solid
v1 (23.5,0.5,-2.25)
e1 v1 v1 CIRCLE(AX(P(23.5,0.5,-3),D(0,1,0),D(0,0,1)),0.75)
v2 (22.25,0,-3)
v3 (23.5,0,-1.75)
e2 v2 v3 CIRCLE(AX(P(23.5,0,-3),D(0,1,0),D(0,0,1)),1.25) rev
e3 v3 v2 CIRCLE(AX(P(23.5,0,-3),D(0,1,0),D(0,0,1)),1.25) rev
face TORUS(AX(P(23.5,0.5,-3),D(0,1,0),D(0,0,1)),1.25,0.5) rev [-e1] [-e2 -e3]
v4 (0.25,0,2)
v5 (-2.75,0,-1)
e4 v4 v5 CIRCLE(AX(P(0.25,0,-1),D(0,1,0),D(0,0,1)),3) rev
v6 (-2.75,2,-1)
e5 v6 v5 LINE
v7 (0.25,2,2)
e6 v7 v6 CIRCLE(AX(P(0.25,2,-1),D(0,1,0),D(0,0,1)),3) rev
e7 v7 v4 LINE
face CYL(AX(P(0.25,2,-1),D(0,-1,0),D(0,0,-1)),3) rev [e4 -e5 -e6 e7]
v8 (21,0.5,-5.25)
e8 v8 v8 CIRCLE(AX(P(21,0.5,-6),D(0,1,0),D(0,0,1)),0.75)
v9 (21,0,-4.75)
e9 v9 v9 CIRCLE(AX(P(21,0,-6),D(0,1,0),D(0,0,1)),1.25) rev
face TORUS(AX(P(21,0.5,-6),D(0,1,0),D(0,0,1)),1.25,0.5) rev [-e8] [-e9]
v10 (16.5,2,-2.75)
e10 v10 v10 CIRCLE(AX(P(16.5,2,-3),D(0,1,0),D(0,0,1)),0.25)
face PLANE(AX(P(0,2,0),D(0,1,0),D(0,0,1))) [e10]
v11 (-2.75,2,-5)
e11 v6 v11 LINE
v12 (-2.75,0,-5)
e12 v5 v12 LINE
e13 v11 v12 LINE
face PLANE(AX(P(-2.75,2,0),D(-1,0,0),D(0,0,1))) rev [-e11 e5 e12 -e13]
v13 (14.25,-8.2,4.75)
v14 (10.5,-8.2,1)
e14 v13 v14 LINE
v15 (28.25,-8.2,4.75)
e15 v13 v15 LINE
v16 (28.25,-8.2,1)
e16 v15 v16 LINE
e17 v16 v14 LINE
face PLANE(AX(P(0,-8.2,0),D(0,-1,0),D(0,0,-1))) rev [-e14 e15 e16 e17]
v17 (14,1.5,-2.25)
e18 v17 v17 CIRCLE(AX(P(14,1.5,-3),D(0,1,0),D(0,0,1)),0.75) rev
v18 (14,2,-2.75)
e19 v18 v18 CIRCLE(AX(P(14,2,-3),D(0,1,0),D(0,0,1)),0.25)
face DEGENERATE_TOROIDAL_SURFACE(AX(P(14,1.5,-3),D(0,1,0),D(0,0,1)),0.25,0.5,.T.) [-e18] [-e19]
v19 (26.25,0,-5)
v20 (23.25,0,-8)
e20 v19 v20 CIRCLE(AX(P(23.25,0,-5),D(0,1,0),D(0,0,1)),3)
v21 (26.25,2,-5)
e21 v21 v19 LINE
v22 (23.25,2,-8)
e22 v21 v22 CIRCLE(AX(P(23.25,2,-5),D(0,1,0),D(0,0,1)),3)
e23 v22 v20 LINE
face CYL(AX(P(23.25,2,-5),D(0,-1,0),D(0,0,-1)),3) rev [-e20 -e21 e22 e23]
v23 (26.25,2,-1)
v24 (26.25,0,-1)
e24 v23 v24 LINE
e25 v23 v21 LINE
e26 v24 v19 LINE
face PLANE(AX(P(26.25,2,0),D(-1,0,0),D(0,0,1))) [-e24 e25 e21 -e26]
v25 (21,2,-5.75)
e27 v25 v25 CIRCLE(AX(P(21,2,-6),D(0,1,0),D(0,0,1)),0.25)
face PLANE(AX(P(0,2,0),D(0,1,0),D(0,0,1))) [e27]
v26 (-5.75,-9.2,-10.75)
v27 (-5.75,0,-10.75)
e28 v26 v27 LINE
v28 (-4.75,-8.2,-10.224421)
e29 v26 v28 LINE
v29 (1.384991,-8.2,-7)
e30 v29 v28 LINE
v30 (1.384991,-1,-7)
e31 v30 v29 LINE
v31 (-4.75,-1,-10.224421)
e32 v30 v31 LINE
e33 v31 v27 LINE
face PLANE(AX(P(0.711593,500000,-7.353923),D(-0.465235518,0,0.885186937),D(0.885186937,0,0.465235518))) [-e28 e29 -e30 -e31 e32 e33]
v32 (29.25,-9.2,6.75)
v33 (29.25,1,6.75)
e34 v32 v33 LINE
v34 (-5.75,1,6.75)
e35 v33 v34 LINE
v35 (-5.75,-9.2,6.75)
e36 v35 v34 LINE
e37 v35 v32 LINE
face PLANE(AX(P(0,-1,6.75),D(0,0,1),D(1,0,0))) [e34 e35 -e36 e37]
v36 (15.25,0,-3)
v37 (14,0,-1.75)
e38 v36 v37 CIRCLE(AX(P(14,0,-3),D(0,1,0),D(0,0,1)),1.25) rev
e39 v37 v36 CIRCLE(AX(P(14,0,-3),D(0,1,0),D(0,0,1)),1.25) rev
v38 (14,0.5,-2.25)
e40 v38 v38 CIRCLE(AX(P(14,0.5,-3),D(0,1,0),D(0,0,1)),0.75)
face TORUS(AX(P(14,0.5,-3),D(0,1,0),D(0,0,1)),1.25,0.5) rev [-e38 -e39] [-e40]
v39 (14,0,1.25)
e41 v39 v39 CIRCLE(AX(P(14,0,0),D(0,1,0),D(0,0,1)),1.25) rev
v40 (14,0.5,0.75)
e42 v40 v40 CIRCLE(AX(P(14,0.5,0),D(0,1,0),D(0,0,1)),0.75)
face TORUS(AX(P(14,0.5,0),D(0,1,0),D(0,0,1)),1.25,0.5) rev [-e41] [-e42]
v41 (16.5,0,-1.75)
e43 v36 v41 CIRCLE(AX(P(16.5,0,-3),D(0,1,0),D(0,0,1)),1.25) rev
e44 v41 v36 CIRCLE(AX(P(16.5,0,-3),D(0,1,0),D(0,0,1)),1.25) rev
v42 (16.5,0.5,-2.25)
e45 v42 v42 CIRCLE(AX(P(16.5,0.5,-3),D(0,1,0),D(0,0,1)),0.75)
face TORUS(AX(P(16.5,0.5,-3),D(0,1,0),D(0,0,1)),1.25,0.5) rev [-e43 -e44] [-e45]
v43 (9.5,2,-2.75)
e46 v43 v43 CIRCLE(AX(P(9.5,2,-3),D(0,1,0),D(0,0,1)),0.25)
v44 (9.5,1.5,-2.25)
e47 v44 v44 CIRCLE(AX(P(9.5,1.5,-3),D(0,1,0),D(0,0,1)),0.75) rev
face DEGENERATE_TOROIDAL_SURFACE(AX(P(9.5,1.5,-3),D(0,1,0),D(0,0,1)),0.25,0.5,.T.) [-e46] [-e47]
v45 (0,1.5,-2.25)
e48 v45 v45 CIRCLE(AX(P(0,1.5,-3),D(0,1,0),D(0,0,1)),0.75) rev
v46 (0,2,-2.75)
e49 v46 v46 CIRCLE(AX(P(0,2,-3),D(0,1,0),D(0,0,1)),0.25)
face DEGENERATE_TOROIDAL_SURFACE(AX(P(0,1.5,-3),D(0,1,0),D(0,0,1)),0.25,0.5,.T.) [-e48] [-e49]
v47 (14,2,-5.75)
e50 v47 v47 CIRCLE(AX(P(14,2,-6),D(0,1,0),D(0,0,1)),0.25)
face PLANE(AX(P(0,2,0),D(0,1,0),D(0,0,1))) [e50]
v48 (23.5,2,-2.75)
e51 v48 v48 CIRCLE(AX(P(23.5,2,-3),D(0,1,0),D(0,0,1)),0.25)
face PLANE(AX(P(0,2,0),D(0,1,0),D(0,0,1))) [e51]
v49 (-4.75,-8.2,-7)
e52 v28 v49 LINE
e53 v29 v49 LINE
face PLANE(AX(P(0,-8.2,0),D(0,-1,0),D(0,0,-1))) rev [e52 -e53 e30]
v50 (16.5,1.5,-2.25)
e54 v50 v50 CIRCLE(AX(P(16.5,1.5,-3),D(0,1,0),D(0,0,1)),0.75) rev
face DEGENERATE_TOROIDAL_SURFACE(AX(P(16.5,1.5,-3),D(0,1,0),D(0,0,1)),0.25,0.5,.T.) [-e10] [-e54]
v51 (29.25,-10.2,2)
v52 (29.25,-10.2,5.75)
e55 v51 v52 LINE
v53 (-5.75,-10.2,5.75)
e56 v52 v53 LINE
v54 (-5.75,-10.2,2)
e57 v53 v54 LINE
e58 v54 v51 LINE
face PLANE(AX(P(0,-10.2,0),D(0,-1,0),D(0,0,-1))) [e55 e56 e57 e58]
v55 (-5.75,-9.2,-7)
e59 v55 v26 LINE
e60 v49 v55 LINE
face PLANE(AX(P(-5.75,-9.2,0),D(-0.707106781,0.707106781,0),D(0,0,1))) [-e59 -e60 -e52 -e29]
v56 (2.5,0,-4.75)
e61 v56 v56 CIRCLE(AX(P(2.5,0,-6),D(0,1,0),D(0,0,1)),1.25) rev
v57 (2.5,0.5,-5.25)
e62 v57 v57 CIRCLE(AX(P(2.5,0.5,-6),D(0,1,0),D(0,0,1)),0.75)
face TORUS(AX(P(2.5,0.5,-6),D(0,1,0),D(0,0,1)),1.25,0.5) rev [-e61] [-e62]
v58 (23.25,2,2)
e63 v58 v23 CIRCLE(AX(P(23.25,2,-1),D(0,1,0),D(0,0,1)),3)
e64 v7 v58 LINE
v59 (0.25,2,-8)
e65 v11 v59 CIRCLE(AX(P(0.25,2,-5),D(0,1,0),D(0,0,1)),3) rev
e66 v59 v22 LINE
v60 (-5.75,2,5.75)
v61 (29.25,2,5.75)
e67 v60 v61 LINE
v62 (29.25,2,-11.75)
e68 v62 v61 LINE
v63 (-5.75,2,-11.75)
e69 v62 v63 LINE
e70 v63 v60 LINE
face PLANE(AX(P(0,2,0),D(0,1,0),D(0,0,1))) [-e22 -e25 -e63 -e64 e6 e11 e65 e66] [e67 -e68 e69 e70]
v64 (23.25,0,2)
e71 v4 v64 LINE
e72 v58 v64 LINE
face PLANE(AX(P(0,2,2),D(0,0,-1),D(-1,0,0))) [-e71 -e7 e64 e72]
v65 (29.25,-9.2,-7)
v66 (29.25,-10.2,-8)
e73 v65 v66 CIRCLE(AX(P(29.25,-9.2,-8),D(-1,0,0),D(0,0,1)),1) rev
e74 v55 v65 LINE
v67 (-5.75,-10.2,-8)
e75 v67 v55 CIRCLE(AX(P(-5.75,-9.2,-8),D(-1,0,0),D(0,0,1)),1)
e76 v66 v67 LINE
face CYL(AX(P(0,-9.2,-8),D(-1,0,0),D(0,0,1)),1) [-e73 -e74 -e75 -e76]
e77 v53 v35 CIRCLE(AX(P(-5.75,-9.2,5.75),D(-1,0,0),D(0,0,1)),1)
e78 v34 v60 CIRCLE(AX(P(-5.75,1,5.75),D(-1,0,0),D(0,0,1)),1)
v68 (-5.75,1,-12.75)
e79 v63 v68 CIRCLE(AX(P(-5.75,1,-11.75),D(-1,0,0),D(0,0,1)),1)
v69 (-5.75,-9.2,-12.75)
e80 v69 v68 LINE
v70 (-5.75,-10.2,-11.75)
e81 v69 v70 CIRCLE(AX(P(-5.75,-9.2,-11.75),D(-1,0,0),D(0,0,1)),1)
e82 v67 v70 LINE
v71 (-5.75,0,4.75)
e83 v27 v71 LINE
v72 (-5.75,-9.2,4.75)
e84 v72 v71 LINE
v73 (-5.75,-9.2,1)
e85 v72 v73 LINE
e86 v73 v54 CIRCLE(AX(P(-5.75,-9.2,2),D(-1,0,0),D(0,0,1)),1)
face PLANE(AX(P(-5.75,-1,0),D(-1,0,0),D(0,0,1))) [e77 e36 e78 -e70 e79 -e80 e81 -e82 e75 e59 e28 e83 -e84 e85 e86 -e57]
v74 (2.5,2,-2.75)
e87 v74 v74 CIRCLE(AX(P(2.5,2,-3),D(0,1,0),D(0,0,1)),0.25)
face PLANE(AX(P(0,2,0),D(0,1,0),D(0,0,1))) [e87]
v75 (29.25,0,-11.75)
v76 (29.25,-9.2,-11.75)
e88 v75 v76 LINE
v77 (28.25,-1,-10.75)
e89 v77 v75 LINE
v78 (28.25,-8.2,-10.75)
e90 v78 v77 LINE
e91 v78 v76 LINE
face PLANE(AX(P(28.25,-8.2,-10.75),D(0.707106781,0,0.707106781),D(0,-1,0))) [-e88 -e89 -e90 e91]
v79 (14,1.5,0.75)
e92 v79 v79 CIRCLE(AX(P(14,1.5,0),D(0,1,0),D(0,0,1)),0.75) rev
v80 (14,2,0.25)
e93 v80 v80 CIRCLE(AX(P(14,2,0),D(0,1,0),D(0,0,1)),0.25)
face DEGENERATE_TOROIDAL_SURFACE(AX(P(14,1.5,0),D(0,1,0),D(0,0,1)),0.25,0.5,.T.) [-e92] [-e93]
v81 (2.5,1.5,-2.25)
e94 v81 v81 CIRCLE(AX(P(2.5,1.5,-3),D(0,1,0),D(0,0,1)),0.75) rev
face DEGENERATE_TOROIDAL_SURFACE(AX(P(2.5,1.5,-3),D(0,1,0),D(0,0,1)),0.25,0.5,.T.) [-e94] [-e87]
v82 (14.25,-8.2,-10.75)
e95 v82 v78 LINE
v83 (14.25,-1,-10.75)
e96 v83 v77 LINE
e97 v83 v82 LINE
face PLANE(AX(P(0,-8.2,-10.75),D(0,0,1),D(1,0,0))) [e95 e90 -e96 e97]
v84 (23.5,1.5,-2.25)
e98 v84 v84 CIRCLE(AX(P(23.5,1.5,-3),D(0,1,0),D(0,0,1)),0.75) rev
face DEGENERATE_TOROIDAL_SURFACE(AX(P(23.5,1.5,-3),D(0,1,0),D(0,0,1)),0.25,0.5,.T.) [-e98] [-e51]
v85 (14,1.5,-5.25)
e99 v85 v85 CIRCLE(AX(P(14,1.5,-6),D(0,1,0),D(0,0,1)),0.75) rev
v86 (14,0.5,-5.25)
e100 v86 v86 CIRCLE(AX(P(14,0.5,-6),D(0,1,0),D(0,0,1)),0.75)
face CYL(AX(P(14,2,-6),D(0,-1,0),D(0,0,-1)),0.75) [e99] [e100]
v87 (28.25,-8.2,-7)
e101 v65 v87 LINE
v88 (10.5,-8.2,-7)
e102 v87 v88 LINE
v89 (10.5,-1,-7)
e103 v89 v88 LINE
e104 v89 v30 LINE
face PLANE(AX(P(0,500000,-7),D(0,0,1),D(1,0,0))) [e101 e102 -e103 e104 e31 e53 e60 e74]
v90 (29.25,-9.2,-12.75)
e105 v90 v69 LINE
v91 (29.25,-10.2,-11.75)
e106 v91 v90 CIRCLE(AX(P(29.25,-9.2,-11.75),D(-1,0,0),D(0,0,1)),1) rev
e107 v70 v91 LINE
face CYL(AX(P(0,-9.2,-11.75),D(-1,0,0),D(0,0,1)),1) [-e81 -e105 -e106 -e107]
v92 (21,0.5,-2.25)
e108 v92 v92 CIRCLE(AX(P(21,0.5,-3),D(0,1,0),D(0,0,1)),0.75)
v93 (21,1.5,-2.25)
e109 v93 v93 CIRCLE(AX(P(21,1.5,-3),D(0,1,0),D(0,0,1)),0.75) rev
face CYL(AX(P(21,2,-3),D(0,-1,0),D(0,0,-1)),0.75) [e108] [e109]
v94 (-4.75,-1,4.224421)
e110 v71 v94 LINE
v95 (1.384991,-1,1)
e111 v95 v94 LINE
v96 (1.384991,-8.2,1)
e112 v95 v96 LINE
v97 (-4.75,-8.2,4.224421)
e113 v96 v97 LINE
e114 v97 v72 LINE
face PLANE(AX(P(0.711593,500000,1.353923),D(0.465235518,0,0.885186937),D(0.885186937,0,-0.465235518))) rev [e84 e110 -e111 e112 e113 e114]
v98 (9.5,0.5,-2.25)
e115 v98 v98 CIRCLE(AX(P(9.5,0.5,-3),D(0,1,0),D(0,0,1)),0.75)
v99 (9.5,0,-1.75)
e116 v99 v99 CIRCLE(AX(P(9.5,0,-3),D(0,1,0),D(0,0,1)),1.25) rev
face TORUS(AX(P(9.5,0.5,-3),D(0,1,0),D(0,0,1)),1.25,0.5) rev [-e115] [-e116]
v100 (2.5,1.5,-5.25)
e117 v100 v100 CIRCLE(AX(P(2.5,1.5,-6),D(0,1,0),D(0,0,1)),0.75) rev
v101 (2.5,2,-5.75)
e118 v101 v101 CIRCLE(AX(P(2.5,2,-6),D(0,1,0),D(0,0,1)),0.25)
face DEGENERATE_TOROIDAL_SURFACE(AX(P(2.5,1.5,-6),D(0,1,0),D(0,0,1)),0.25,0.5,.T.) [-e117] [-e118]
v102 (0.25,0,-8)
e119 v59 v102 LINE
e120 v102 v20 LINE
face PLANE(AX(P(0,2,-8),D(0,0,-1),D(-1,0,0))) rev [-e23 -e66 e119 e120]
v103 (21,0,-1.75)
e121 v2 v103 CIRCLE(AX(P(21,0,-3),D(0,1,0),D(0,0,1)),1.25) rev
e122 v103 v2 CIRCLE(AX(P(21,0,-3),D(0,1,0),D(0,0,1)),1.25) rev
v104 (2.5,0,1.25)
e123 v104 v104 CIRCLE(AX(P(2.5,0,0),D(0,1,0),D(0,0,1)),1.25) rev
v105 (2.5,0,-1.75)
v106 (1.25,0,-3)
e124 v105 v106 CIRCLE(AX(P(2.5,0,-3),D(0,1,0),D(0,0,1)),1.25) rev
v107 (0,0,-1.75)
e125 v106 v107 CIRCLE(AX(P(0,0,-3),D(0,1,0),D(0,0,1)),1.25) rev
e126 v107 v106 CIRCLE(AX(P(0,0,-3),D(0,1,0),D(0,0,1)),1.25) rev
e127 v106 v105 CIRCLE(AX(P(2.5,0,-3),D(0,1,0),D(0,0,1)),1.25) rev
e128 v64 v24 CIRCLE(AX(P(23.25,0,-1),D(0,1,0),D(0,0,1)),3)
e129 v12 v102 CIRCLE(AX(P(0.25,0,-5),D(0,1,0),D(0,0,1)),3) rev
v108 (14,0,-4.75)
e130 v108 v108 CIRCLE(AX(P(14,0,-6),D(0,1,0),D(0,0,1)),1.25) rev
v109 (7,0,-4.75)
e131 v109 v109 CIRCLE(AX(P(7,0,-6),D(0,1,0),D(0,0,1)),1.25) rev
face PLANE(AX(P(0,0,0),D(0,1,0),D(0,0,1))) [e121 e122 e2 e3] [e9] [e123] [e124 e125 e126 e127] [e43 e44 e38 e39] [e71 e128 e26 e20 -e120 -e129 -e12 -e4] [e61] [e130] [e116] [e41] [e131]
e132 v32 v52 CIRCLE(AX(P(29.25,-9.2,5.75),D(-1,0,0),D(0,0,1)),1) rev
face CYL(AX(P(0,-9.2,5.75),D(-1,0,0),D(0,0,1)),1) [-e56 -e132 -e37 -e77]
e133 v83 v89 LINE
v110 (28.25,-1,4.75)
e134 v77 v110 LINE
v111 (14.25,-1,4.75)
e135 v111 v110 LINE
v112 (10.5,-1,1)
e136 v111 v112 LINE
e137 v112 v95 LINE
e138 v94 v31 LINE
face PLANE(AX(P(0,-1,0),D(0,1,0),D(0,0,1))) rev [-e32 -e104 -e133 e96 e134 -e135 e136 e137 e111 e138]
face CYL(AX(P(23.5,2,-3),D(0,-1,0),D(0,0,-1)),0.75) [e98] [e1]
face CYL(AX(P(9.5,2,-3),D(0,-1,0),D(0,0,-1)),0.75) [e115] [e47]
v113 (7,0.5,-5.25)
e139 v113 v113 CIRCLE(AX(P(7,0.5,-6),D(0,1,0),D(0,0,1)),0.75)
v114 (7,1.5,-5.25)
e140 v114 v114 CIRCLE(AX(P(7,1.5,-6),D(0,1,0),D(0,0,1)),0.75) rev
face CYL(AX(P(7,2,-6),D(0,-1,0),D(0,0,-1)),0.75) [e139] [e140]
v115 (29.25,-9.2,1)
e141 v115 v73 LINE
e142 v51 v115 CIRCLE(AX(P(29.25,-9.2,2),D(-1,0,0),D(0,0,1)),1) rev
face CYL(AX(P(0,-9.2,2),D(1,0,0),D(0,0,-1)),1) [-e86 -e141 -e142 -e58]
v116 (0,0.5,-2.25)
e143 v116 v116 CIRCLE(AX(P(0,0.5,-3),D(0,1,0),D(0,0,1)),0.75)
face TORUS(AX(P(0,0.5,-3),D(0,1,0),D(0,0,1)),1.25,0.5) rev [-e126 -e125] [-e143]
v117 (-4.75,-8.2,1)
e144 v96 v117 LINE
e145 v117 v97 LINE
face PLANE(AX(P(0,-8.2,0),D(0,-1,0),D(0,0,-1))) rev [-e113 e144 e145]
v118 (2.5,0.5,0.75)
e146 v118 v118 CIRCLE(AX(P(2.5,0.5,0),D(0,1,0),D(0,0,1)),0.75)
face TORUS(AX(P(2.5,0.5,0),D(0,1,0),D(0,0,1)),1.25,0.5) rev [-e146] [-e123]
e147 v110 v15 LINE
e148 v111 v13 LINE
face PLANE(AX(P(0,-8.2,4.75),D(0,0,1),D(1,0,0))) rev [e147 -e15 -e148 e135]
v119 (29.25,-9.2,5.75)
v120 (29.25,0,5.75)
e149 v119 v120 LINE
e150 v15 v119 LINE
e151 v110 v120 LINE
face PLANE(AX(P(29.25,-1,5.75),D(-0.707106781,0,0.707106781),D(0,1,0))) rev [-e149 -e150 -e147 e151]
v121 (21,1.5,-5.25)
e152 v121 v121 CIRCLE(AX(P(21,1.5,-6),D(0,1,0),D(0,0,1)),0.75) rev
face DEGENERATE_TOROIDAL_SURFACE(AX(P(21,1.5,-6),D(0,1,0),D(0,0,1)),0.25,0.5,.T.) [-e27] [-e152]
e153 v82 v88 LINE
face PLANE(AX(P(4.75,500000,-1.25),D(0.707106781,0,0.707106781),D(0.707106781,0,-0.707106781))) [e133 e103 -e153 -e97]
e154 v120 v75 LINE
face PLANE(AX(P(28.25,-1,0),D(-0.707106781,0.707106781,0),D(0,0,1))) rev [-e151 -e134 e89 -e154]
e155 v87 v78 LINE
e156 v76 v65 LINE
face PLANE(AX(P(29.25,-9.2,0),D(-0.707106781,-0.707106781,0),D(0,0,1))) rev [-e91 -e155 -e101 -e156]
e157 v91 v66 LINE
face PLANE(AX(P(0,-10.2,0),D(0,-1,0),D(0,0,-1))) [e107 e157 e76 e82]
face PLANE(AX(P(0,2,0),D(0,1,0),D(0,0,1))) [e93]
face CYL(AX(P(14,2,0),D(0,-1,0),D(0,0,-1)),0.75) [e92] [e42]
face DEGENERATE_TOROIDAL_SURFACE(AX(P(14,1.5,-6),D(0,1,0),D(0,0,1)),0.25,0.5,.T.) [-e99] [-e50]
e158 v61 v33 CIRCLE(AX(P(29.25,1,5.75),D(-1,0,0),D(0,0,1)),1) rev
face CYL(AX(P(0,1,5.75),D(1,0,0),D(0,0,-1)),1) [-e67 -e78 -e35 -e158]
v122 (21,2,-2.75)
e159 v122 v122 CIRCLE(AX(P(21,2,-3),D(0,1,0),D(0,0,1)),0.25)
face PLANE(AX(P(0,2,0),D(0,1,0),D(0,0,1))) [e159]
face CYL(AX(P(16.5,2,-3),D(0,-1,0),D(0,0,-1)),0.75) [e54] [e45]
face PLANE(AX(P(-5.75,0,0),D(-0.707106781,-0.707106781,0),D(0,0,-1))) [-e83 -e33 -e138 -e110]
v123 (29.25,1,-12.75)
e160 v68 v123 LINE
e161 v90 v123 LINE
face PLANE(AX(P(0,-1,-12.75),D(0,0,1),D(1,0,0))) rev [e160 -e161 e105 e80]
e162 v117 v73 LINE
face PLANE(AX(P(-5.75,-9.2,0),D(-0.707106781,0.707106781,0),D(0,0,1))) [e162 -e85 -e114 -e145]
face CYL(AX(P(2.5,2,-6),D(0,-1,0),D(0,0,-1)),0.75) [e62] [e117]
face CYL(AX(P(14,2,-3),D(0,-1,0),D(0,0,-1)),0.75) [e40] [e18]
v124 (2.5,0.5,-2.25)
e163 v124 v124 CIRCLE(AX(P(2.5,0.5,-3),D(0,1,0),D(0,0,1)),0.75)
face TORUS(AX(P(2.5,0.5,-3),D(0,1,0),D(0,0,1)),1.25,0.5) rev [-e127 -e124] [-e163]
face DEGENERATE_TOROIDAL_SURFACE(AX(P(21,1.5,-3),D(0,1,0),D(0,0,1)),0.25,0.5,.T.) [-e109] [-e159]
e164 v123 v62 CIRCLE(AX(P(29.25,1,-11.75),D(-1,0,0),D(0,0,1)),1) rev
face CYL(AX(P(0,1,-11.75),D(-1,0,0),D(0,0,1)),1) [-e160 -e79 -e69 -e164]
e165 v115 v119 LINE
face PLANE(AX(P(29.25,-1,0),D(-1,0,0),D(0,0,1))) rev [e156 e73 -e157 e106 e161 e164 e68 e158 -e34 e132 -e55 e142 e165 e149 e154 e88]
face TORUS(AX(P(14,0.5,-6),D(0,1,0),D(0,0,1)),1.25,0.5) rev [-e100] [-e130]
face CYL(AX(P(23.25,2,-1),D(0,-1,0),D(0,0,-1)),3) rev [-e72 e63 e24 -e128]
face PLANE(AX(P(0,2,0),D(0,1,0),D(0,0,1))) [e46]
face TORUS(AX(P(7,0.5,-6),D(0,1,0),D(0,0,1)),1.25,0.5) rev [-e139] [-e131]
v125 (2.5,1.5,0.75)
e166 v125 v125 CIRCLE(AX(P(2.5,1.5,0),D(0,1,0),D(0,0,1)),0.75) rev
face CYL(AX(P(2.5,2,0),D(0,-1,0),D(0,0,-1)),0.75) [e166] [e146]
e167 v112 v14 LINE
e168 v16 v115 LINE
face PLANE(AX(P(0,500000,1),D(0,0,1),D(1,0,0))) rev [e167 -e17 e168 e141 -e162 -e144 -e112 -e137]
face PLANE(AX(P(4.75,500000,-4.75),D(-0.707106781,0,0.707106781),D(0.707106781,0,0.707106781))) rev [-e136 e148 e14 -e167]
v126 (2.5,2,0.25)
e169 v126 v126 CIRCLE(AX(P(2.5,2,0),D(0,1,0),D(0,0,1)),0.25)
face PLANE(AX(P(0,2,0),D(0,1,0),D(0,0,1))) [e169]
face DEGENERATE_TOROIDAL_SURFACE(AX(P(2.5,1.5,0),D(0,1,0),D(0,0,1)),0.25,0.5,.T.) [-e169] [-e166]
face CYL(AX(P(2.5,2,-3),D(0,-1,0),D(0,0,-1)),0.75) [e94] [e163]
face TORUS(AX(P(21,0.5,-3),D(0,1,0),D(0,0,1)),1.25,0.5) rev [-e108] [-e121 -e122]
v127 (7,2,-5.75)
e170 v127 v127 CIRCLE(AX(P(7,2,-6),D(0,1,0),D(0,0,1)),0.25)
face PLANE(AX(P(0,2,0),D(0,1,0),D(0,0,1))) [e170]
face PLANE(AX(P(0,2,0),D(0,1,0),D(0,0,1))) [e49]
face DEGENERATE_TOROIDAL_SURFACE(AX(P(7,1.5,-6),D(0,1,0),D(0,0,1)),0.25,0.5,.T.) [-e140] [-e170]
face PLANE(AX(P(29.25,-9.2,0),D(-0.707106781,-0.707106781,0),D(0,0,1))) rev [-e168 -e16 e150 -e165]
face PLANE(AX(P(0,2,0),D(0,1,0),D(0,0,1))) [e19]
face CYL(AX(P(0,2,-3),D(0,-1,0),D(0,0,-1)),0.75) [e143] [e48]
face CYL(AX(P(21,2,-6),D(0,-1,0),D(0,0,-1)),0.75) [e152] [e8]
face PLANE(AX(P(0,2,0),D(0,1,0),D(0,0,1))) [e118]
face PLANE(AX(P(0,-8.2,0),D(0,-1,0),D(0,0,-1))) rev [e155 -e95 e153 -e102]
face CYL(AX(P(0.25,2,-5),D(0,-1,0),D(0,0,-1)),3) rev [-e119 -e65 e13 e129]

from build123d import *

# Parameters (mm, degrees)
SKETCH1_R              = 0.75
BOSS_EXTRUDE1_DEPTH    = 2
BOSS_EXTRUDE1_2_DEPTH  = 2
BOSS_EXTRUDE1_3_DEPTH  = 2
BOSS_EXTRUDE1_4_DEPTH  = 2
BOSS_EXTRUDE1_5_DEPTH  = 2
BOSS_EXTRUDE1_6_DEPTH  = 2
BOSS_EXTRUDE1_7_DEPTH  = 2
BOSS_EXTRUDE1_8_DEPTH  = 2
BOSS_EXTRUDE1_9_DEPTH  = 2
BOSS_EXTRUDE1_10_DEPTH = 2
BOSS_EXTRUDE1_11_DEPTH = 2
BOSS_EXTRUDE1_12_DEPTH = 2
BOSS_EXTRUDE1_13_DEPTH = 2
SKETCH1_3_W            = 35
SKETCH1_3_H            = 19.5
BOSS_EXTRUDE2_DEPTH    = 1
FILLET1_R              = 0.5
SKETCH1_4_W            = 35
SKETCH1_4_H            = 17.5
SKETCH1_4_H_2          = 2
BOSS_EXTRUDE3_DEPTH    = 2
SKETCH1_5_W            = 35
SKETCH1_5_H            = 2
BOSS_EXTRUDE4_DEPTH    = 8.2
BOSS_EXTRUDE5_REACH    = 35.499
SKETCH2_3_W            = 35
SKETCH2_3_H            = 2
SKETCH2_3_H_2          = 7.75
BOSS_EXTRUDE6_DEPTH    = 2
FILLET2_R              = 1
CHAMFER1_SIZE          = 1
CUT_EXTRUDE1_DEPTH     = 2
FILLET3_R              = 1
CHAMFER2_SIZE          = 1


with BuildPart() as part:
    # Sketch1 → Boss-Extrude1 (new body)
    with BuildSketch(Plane(origin=(0, 0, 0), x_dir=(1, 0, 0), z_dir=(0, 1, 0))):
        with Locations(Location((2.5, 3, 0), (0, 0, 270))):
            Circle(SKETCH1_R)
    extrude(amount=BOSS_EXTRUDE1_DEPTH)



with BuildPart() as body_2:
    # Sketch1 → Boss-Extrude1 2 (new body)
    with BuildSketch(Plane(origin=(0, 0, 0), x_dir=(1, 0, 0), z_dir=(0, 1, 0))):
        with Locations(Location((2.5, 6, 0), (0, 0, 270))):
            Circle(SKETCH1_R)
    extrude(amount=BOSS_EXTRUDE1_2_DEPTH)


with BuildPart() as body_3:
    # Sketch1 → Boss-Extrude1 3 (new body)
    with BuildSketch(Plane(origin=(0, 0, 0), x_dir=(1, 0, 0), z_dir=(0, 1, 0))):
        with Locations(Location((2.5, 0, 0), (0, 0, 270))):
            Circle(SKETCH1_R)
    extrude(amount=BOSS_EXTRUDE1_3_DEPTH)


with BuildPart() as body_4:
    # Sketch1 → Boss-Extrude1 4 (new body)
    with BuildSketch(Plane(origin=(0, 0, 0), x_dir=(1, 0, 0), z_dir=(0, 1, 0))):
        with Locations(Location((0, 3, 0), (0, 0, 270))):
            Circle(SKETCH1_R)
    extrude(amount=BOSS_EXTRUDE1_4_DEPTH)


with BuildPart() as body_5:
    # Sketch1 → Boss-Extrude1 5 (new body)
    with BuildSketch(Plane(origin=(0, 0, 0), x_dir=(1, 0, 0), z_dir=(0, 1, 0))):
        with Locations(Location((7, 6, 0), (0, 0, 270))):
            Circle(SKETCH1_R)
    extrude(amount=BOSS_EXTRUDE1_5_DEPTH)


with BuildPart() as body_6:
    # Sketch1 → Boss-Extrude1 6 (new body)
    with BuildSketch(Plane(origin=(0, 0, 0), x_dir=(1, 0, 0), z_dir=(0, 1, 0))):
        with Locations(Location((9.5, 3, 0), (0, 0, 270))):
            Circle(SKETCH1_R)
    extrude(amount=BOSS_EXTRUDE1_6_DEPTH)


with BuildPart() as body_7:
    # Sketch1 → Boss-Extrude1 7 (new body)
    with BuildSketch(Plane(origin=(0, 0, 0), x_dir=(1, 0, 0), z_dir=(0, 1, 0))):
        with Locations(Location((14, 6, 0), (0, 0, 270))):
            Circle(SKETCH1_R)
    extrude(amount=BOSS_EXTRUDE1_7_DEPTH)


with BuildPart() as body_8:
    # Sketch1 → Boss-Extrude1 8 (new body)
    with BuildSketch(Plane(origin=(0, 0, 0), x_dir=(1, 0, 0), z_dir=(0, 1, 0))):
        with Locations(Location((14, 3, 0), (0, 0, 270))):
            Circle(SKETCH1_R)
    extrude(amount=BOSS_EXTRUDE1_8_DEPTH)


with BuildPart() as body_9:
    # Sketch1 → Boss-Extrude1 9 (new body)
    with BuildSketch(Plane(origin=(0, 0, 0), x_dir=(1, 0, 0), z_dir=(0, 1, 0))):
        with Locations(Location((16.5, 3, 0), (0, 0, 270))):
            Circle(SKETCH1_R)
    extrude(amount=BOSS_EXTRUDE1_9_DEPTH)


with BuildPart() as body_10:
    # Sketch1 → Boss-Extrude1 10 (new body)
    with BuildSketch(Plane(origin=(0, 0, 0), x_dir=(1, 0, 0), z_dir=(0, 1, 0))):
        with Locations(Location((14, 0, 0), (0, 0, 270))):
            Circle(SKETCH1_R)
    extrude(amount=BOSS_EXTRUDE1_10_DEPTH)


with BuildPart() as body_11:
    # Sketch1 → Boss-Extrude1 11 (new body)
    with BuildSketch(Plane(origin=(0, 0, 0), x_dir=(1, 0, 0), z_dir=(0, 1, 0))):
        with Locations(Location((21, 6, 0), (0, 0, 270))):
            Circle(SKETCH1_R)
    extrude(amount=BOSS_EXTRUDE1_11_DEPTH)


with BuildPart() as body_12:
    # Sketch1 → Boss-Extrude1 12 (new body)
    with BuildSketch(Plane(origin=(0, 0, 0), x_dir=(1, 0, 0), z_dir=(0, 1, 0))):
        with Locations(Location((21, 3, 0), (0, 0, 270))):
            Circle(SKETCH1_R)
    extrude(amount=BOSS_EXTRUDE1_12_DEPTH)


with BuildPart() as body_13:
    # Sketch1 → Boss-Extrude1 13 (new body)
    with BuildSketch(Plane(origin=(0, 0, 0), x_dir=(1, 0, 0), z_dir=(0, 1, 0))):
        with Locations(Location((23.5, 3, 0), (0, 0, 270))):
            Circle(SKETCH1_R)
    extrude(amount=BOSS_EXTRUDE1_13_DEPTH)


with BuildPart() as part_1:
    add(part.part)

    add(body_2.part)  # Boss-Extrude2 merges body 2

    add(body_3.part)  # Boss-Extrude2 merges body 3

    add(body_4.part)  # Boss-Extrude2 merges body 4

    add(body_5.part)  # Boss-Extrude2 merges body 5

    add(body_6.part)  # Boss-Extrude2 merges body 6

    add(body_7.part)  # Boss-Extrude2 merges body 7

    add(body_8.part)  # Boss-Extrude2 merges body 8

    add(body_9.part)  # Boss-Extrude2 merges body 9

    add(body_10.part)  # Boss-Extrude2 merges body 10

    add(body_11.part)  # Boss-Extrude2 merges body 11

    add(body_12.part)  # Boss-Extrude2 merges body 12

    add(body_13.part)  # Boss-Extrude2 merges body 13
    # Sketch1<3> → Boss-Extrude2 (add)
    with BuildSketch(Plane(origin=(0, 0, 0), x_dir=(1, 0, 0), z_dir=(0, 1, 0))):
        with Locations((11.75, 3)):
            Rectangle(SKETCH1_3_W, SKETCH1_3_H)
    extrude(amount=-BOSS_EXTRUDE2_DEPTH)

    # Fillet1
    fillet1_edges = [part_1.edges().sort_by_distance(p)[0] for p in [
        (2.5, 0, -6.75),
        (2.5, 2, -6.75),
        (2.5, 0, -3.75),
        (2.5, 2, -3.75),
        (2.5, 0, -0.75),
        (2.5, 2, -0.75),
        (7, 0, -6.75),
        (7, 2, -6.75),
        (9.5, 0, -3.75),
        (9.5, 2, -3.75),
        (14, 0, -6.75),
        (14, 2, -6.75),
        (14, 0, -3.75),
        (14, 2, -3.75),
        (14, 0, -0.75),
        (14, 2, -0.75),
        (16.5, 0, -3.75),
        (16.5, 2, -3.75),
        (0, 2, -3.75),
        (21, 0, -6.75),
        (21, 2, -6.75),
        (21, 0, -3.75),
        (21, 2, -3.75),
        (23.5, 0, -3.75),
        (23.5, 2, -3.75),
        (0, 0, -3.75),
    ]]
    fillet(fillet1_edges, radius=FILLET1_R - 0.0001)  # a hair under: the kernel refuses the full size

    # Sketch1<4> → Boss-Extrude3 (add)
    # profile 1 of 2: a face of its own
    with BuildSketch(Plane(origin=(0, 0, 0), x_dir=(1, 0, 0), z_dir=(0, 1, 0))):
        with Locations((11.75, 2)):
            Rectangle(SKETCH1_4_W, SKETCH1_4_H)
        with BuildLine():
            Line((23.25, -2), (0.25, -2))
            ThreePointArc((0.25, -2), (-1.871320344, -1.121320344), (-2.75, 1))
            Line((-2.75, 1), (-2.75, 5))
            ThreePointArc((-2.75, 5), (-1.871320344, 7.121320344), (0.25, 8))
            Line((0.25, 8), (23.25, 8))
            ThreePointArc((23.25, 8), (25.371320344, 7.121320344), (26.25, 5))
            Line((26.25, 5), (26.25, 1))
            ThreePointArc((26.25, 1), (25.371320344, -1.121320344), (23.25, -2))
        make_face(mode=Mode.SUBTRACT)
    # profile 2 of 2: a face of its own
    with BuildSketch(Plane(origin=(0, 0, 0), x_dir=(1, 0, 0), z_dir=(0, 1, 0))):
        with Locations((11.75, 11.75)):
            Rectangle(SKETCH1_4_W, SKETCH1_4_H_2)
    extrude(amount=BOSS_EXTRUDE3_DEPTH)

    # Sketch1<5> → Boss-Extrude4 (add)
    with BuildSketch(Plane(origin=(0, 0, 0), x_dir=(1, 0, 0), z_dir=(0, 1, 0))):
        with Locations((11.75, 11.75)):
            Rectangle(SKETCH1_5_W, SKETCH1_5_H)
    boss_extrude4 = extrude(amount=-BOSS_EXTRUDE4_DEPTH)

    # Mirror1: Boss-Extrude4 across plane
    add(boss_extrude4.mirror(Plane(origin=(0, 0, -3), x_dir=(1, 0, 0), z_dir=(0, 0, -1))))

    # Sketch2 → Boss-Extrude5 (add, up to next)
    with BuildSketch(Plane.XZ.offset(8.2), mode=Mode.PRIVATE) as boss_extrude5_sk1:
        Polygon((1.384990523, 1), (10.5, 1), (14.25, 4.75), (-5.75, 4.75), align=None)
    boss_extrude5_tool1 = extrude(boss_extrude5_sk1.sketch, amount=-BOSS_EXTRUDE5_REACH, mode=Mode.PRIVATE) - part_1.part
    boss_extrude5 = boss_extrude5_tool1.solids().sort_by_distance((4.990788, -8.2, 3.108664))[0]
    add(boss_extrude5)

    # Mirror2: Boss-Extrude5 across plane
    add(boss_extrude5.mirror(Plane(origin=(0, 0, -3), x_dir=(1, 0, 0), z_dir=(0, 0, -1))))

    # Sketch2<3> → Boss-Extrude6 (add)
    with BuildSketch(Plane.XZ.offset(8.2)):
        with Locations((11.75, -11.75)):
            Rectangle(SKETCH2_3_W, SKETCH2_3_H)
        with Locations((11.75, -6.875)):
            Rectangle(SKETCH2_3_W, SKETCH2_3_H_2)
        Polygon((-5.75, -3), (29.25, -3), (29.25, 1), (10.5, 1), (1.384990523, 1), (-5.75, 1), align=None)
        Polygon((1.384990523, 1), (10.5, 1), (14.25, 4.75), (-5.75, 4.75), align=None)
        Polygon((10.5, 1), (29.25, 1), (29.25, 6.75), (-5.75, 6.75), (-5.75, 4.75), (14.25, 4.75), align=None)
        Polygon((-5.75, 4.75), (-5.75, 1), (1.384990523, 1), align=None)
    extrude(amount=BOSS_EXTRUDE6_DEPTH)

    # Fillet2
    fillet2_edges = [part_1.edges().sort_by_distance(p)[0] for p in [
        (11.75, 2, -12.75),
        (11.75, 2, 6.75),
        (11.75, -10.2, 6.75),
        (11.75, -10.2, -12.75),
    ]]
    fillet(fillet2_edges, radius=FILLET2_R)

    # Chamfer1
    chamfer1_edges = [part_1.edges().sort_by_distance(p)[0] for p in [
        (-5.75, -1, -3),
        (-5.75, -8.2, -3),
    ]]
    chamfer(chamfer1_edges, length=CHAMFER1_SIZE)

    # Sketch2<4> → Cut-Extrude1 (cut)
    with BuildSketch(Plane.XZ.offset(8.2)):
        Polygon((-5.75, -3), (29.25, -3), (29.25, 1), (10.5, 1), (1.384990523, 1), (-5.75, 1), align=None)
    cut_extrude1 = extrude(amount=CUT_EXTRUDE1_DEPTH, mode=Mode.SUBTRACT)

    # Mirror3: Cut-Extrude1 across plane
    add(cut_extrude1.mirror(Plane(origin=(0, 0, -3), x_dir=(1, 0, 0), z_dir=(0, 0, -1))), mode=Mode.SUBTRACT)

    # Fillet3
    fillet3_edges = [part_1.edges().sort_by_distance(p)[0] for p in [
        (11.75, -10.2, -7),
        (11.75, -10.2, 1),
    ]]
    fillet(fillet3_edges, radius=FILLET3_R)

    # Chamfer2
    chamfer2_edges = [part_1.edges().sort_by_distance(p)[0] for p in [
        (29.25, -8.2, 2.875),
        (29.25, -4.6, 4.75),
        (29.25, -8.2, -8.875),
        (29.25, -4.6, -10.75),
        (29.25, -1, -3),
    ]]
    chamfer(chamfer2_edges, length=CHAMFER2_SIZE)


solid = part_1.part
